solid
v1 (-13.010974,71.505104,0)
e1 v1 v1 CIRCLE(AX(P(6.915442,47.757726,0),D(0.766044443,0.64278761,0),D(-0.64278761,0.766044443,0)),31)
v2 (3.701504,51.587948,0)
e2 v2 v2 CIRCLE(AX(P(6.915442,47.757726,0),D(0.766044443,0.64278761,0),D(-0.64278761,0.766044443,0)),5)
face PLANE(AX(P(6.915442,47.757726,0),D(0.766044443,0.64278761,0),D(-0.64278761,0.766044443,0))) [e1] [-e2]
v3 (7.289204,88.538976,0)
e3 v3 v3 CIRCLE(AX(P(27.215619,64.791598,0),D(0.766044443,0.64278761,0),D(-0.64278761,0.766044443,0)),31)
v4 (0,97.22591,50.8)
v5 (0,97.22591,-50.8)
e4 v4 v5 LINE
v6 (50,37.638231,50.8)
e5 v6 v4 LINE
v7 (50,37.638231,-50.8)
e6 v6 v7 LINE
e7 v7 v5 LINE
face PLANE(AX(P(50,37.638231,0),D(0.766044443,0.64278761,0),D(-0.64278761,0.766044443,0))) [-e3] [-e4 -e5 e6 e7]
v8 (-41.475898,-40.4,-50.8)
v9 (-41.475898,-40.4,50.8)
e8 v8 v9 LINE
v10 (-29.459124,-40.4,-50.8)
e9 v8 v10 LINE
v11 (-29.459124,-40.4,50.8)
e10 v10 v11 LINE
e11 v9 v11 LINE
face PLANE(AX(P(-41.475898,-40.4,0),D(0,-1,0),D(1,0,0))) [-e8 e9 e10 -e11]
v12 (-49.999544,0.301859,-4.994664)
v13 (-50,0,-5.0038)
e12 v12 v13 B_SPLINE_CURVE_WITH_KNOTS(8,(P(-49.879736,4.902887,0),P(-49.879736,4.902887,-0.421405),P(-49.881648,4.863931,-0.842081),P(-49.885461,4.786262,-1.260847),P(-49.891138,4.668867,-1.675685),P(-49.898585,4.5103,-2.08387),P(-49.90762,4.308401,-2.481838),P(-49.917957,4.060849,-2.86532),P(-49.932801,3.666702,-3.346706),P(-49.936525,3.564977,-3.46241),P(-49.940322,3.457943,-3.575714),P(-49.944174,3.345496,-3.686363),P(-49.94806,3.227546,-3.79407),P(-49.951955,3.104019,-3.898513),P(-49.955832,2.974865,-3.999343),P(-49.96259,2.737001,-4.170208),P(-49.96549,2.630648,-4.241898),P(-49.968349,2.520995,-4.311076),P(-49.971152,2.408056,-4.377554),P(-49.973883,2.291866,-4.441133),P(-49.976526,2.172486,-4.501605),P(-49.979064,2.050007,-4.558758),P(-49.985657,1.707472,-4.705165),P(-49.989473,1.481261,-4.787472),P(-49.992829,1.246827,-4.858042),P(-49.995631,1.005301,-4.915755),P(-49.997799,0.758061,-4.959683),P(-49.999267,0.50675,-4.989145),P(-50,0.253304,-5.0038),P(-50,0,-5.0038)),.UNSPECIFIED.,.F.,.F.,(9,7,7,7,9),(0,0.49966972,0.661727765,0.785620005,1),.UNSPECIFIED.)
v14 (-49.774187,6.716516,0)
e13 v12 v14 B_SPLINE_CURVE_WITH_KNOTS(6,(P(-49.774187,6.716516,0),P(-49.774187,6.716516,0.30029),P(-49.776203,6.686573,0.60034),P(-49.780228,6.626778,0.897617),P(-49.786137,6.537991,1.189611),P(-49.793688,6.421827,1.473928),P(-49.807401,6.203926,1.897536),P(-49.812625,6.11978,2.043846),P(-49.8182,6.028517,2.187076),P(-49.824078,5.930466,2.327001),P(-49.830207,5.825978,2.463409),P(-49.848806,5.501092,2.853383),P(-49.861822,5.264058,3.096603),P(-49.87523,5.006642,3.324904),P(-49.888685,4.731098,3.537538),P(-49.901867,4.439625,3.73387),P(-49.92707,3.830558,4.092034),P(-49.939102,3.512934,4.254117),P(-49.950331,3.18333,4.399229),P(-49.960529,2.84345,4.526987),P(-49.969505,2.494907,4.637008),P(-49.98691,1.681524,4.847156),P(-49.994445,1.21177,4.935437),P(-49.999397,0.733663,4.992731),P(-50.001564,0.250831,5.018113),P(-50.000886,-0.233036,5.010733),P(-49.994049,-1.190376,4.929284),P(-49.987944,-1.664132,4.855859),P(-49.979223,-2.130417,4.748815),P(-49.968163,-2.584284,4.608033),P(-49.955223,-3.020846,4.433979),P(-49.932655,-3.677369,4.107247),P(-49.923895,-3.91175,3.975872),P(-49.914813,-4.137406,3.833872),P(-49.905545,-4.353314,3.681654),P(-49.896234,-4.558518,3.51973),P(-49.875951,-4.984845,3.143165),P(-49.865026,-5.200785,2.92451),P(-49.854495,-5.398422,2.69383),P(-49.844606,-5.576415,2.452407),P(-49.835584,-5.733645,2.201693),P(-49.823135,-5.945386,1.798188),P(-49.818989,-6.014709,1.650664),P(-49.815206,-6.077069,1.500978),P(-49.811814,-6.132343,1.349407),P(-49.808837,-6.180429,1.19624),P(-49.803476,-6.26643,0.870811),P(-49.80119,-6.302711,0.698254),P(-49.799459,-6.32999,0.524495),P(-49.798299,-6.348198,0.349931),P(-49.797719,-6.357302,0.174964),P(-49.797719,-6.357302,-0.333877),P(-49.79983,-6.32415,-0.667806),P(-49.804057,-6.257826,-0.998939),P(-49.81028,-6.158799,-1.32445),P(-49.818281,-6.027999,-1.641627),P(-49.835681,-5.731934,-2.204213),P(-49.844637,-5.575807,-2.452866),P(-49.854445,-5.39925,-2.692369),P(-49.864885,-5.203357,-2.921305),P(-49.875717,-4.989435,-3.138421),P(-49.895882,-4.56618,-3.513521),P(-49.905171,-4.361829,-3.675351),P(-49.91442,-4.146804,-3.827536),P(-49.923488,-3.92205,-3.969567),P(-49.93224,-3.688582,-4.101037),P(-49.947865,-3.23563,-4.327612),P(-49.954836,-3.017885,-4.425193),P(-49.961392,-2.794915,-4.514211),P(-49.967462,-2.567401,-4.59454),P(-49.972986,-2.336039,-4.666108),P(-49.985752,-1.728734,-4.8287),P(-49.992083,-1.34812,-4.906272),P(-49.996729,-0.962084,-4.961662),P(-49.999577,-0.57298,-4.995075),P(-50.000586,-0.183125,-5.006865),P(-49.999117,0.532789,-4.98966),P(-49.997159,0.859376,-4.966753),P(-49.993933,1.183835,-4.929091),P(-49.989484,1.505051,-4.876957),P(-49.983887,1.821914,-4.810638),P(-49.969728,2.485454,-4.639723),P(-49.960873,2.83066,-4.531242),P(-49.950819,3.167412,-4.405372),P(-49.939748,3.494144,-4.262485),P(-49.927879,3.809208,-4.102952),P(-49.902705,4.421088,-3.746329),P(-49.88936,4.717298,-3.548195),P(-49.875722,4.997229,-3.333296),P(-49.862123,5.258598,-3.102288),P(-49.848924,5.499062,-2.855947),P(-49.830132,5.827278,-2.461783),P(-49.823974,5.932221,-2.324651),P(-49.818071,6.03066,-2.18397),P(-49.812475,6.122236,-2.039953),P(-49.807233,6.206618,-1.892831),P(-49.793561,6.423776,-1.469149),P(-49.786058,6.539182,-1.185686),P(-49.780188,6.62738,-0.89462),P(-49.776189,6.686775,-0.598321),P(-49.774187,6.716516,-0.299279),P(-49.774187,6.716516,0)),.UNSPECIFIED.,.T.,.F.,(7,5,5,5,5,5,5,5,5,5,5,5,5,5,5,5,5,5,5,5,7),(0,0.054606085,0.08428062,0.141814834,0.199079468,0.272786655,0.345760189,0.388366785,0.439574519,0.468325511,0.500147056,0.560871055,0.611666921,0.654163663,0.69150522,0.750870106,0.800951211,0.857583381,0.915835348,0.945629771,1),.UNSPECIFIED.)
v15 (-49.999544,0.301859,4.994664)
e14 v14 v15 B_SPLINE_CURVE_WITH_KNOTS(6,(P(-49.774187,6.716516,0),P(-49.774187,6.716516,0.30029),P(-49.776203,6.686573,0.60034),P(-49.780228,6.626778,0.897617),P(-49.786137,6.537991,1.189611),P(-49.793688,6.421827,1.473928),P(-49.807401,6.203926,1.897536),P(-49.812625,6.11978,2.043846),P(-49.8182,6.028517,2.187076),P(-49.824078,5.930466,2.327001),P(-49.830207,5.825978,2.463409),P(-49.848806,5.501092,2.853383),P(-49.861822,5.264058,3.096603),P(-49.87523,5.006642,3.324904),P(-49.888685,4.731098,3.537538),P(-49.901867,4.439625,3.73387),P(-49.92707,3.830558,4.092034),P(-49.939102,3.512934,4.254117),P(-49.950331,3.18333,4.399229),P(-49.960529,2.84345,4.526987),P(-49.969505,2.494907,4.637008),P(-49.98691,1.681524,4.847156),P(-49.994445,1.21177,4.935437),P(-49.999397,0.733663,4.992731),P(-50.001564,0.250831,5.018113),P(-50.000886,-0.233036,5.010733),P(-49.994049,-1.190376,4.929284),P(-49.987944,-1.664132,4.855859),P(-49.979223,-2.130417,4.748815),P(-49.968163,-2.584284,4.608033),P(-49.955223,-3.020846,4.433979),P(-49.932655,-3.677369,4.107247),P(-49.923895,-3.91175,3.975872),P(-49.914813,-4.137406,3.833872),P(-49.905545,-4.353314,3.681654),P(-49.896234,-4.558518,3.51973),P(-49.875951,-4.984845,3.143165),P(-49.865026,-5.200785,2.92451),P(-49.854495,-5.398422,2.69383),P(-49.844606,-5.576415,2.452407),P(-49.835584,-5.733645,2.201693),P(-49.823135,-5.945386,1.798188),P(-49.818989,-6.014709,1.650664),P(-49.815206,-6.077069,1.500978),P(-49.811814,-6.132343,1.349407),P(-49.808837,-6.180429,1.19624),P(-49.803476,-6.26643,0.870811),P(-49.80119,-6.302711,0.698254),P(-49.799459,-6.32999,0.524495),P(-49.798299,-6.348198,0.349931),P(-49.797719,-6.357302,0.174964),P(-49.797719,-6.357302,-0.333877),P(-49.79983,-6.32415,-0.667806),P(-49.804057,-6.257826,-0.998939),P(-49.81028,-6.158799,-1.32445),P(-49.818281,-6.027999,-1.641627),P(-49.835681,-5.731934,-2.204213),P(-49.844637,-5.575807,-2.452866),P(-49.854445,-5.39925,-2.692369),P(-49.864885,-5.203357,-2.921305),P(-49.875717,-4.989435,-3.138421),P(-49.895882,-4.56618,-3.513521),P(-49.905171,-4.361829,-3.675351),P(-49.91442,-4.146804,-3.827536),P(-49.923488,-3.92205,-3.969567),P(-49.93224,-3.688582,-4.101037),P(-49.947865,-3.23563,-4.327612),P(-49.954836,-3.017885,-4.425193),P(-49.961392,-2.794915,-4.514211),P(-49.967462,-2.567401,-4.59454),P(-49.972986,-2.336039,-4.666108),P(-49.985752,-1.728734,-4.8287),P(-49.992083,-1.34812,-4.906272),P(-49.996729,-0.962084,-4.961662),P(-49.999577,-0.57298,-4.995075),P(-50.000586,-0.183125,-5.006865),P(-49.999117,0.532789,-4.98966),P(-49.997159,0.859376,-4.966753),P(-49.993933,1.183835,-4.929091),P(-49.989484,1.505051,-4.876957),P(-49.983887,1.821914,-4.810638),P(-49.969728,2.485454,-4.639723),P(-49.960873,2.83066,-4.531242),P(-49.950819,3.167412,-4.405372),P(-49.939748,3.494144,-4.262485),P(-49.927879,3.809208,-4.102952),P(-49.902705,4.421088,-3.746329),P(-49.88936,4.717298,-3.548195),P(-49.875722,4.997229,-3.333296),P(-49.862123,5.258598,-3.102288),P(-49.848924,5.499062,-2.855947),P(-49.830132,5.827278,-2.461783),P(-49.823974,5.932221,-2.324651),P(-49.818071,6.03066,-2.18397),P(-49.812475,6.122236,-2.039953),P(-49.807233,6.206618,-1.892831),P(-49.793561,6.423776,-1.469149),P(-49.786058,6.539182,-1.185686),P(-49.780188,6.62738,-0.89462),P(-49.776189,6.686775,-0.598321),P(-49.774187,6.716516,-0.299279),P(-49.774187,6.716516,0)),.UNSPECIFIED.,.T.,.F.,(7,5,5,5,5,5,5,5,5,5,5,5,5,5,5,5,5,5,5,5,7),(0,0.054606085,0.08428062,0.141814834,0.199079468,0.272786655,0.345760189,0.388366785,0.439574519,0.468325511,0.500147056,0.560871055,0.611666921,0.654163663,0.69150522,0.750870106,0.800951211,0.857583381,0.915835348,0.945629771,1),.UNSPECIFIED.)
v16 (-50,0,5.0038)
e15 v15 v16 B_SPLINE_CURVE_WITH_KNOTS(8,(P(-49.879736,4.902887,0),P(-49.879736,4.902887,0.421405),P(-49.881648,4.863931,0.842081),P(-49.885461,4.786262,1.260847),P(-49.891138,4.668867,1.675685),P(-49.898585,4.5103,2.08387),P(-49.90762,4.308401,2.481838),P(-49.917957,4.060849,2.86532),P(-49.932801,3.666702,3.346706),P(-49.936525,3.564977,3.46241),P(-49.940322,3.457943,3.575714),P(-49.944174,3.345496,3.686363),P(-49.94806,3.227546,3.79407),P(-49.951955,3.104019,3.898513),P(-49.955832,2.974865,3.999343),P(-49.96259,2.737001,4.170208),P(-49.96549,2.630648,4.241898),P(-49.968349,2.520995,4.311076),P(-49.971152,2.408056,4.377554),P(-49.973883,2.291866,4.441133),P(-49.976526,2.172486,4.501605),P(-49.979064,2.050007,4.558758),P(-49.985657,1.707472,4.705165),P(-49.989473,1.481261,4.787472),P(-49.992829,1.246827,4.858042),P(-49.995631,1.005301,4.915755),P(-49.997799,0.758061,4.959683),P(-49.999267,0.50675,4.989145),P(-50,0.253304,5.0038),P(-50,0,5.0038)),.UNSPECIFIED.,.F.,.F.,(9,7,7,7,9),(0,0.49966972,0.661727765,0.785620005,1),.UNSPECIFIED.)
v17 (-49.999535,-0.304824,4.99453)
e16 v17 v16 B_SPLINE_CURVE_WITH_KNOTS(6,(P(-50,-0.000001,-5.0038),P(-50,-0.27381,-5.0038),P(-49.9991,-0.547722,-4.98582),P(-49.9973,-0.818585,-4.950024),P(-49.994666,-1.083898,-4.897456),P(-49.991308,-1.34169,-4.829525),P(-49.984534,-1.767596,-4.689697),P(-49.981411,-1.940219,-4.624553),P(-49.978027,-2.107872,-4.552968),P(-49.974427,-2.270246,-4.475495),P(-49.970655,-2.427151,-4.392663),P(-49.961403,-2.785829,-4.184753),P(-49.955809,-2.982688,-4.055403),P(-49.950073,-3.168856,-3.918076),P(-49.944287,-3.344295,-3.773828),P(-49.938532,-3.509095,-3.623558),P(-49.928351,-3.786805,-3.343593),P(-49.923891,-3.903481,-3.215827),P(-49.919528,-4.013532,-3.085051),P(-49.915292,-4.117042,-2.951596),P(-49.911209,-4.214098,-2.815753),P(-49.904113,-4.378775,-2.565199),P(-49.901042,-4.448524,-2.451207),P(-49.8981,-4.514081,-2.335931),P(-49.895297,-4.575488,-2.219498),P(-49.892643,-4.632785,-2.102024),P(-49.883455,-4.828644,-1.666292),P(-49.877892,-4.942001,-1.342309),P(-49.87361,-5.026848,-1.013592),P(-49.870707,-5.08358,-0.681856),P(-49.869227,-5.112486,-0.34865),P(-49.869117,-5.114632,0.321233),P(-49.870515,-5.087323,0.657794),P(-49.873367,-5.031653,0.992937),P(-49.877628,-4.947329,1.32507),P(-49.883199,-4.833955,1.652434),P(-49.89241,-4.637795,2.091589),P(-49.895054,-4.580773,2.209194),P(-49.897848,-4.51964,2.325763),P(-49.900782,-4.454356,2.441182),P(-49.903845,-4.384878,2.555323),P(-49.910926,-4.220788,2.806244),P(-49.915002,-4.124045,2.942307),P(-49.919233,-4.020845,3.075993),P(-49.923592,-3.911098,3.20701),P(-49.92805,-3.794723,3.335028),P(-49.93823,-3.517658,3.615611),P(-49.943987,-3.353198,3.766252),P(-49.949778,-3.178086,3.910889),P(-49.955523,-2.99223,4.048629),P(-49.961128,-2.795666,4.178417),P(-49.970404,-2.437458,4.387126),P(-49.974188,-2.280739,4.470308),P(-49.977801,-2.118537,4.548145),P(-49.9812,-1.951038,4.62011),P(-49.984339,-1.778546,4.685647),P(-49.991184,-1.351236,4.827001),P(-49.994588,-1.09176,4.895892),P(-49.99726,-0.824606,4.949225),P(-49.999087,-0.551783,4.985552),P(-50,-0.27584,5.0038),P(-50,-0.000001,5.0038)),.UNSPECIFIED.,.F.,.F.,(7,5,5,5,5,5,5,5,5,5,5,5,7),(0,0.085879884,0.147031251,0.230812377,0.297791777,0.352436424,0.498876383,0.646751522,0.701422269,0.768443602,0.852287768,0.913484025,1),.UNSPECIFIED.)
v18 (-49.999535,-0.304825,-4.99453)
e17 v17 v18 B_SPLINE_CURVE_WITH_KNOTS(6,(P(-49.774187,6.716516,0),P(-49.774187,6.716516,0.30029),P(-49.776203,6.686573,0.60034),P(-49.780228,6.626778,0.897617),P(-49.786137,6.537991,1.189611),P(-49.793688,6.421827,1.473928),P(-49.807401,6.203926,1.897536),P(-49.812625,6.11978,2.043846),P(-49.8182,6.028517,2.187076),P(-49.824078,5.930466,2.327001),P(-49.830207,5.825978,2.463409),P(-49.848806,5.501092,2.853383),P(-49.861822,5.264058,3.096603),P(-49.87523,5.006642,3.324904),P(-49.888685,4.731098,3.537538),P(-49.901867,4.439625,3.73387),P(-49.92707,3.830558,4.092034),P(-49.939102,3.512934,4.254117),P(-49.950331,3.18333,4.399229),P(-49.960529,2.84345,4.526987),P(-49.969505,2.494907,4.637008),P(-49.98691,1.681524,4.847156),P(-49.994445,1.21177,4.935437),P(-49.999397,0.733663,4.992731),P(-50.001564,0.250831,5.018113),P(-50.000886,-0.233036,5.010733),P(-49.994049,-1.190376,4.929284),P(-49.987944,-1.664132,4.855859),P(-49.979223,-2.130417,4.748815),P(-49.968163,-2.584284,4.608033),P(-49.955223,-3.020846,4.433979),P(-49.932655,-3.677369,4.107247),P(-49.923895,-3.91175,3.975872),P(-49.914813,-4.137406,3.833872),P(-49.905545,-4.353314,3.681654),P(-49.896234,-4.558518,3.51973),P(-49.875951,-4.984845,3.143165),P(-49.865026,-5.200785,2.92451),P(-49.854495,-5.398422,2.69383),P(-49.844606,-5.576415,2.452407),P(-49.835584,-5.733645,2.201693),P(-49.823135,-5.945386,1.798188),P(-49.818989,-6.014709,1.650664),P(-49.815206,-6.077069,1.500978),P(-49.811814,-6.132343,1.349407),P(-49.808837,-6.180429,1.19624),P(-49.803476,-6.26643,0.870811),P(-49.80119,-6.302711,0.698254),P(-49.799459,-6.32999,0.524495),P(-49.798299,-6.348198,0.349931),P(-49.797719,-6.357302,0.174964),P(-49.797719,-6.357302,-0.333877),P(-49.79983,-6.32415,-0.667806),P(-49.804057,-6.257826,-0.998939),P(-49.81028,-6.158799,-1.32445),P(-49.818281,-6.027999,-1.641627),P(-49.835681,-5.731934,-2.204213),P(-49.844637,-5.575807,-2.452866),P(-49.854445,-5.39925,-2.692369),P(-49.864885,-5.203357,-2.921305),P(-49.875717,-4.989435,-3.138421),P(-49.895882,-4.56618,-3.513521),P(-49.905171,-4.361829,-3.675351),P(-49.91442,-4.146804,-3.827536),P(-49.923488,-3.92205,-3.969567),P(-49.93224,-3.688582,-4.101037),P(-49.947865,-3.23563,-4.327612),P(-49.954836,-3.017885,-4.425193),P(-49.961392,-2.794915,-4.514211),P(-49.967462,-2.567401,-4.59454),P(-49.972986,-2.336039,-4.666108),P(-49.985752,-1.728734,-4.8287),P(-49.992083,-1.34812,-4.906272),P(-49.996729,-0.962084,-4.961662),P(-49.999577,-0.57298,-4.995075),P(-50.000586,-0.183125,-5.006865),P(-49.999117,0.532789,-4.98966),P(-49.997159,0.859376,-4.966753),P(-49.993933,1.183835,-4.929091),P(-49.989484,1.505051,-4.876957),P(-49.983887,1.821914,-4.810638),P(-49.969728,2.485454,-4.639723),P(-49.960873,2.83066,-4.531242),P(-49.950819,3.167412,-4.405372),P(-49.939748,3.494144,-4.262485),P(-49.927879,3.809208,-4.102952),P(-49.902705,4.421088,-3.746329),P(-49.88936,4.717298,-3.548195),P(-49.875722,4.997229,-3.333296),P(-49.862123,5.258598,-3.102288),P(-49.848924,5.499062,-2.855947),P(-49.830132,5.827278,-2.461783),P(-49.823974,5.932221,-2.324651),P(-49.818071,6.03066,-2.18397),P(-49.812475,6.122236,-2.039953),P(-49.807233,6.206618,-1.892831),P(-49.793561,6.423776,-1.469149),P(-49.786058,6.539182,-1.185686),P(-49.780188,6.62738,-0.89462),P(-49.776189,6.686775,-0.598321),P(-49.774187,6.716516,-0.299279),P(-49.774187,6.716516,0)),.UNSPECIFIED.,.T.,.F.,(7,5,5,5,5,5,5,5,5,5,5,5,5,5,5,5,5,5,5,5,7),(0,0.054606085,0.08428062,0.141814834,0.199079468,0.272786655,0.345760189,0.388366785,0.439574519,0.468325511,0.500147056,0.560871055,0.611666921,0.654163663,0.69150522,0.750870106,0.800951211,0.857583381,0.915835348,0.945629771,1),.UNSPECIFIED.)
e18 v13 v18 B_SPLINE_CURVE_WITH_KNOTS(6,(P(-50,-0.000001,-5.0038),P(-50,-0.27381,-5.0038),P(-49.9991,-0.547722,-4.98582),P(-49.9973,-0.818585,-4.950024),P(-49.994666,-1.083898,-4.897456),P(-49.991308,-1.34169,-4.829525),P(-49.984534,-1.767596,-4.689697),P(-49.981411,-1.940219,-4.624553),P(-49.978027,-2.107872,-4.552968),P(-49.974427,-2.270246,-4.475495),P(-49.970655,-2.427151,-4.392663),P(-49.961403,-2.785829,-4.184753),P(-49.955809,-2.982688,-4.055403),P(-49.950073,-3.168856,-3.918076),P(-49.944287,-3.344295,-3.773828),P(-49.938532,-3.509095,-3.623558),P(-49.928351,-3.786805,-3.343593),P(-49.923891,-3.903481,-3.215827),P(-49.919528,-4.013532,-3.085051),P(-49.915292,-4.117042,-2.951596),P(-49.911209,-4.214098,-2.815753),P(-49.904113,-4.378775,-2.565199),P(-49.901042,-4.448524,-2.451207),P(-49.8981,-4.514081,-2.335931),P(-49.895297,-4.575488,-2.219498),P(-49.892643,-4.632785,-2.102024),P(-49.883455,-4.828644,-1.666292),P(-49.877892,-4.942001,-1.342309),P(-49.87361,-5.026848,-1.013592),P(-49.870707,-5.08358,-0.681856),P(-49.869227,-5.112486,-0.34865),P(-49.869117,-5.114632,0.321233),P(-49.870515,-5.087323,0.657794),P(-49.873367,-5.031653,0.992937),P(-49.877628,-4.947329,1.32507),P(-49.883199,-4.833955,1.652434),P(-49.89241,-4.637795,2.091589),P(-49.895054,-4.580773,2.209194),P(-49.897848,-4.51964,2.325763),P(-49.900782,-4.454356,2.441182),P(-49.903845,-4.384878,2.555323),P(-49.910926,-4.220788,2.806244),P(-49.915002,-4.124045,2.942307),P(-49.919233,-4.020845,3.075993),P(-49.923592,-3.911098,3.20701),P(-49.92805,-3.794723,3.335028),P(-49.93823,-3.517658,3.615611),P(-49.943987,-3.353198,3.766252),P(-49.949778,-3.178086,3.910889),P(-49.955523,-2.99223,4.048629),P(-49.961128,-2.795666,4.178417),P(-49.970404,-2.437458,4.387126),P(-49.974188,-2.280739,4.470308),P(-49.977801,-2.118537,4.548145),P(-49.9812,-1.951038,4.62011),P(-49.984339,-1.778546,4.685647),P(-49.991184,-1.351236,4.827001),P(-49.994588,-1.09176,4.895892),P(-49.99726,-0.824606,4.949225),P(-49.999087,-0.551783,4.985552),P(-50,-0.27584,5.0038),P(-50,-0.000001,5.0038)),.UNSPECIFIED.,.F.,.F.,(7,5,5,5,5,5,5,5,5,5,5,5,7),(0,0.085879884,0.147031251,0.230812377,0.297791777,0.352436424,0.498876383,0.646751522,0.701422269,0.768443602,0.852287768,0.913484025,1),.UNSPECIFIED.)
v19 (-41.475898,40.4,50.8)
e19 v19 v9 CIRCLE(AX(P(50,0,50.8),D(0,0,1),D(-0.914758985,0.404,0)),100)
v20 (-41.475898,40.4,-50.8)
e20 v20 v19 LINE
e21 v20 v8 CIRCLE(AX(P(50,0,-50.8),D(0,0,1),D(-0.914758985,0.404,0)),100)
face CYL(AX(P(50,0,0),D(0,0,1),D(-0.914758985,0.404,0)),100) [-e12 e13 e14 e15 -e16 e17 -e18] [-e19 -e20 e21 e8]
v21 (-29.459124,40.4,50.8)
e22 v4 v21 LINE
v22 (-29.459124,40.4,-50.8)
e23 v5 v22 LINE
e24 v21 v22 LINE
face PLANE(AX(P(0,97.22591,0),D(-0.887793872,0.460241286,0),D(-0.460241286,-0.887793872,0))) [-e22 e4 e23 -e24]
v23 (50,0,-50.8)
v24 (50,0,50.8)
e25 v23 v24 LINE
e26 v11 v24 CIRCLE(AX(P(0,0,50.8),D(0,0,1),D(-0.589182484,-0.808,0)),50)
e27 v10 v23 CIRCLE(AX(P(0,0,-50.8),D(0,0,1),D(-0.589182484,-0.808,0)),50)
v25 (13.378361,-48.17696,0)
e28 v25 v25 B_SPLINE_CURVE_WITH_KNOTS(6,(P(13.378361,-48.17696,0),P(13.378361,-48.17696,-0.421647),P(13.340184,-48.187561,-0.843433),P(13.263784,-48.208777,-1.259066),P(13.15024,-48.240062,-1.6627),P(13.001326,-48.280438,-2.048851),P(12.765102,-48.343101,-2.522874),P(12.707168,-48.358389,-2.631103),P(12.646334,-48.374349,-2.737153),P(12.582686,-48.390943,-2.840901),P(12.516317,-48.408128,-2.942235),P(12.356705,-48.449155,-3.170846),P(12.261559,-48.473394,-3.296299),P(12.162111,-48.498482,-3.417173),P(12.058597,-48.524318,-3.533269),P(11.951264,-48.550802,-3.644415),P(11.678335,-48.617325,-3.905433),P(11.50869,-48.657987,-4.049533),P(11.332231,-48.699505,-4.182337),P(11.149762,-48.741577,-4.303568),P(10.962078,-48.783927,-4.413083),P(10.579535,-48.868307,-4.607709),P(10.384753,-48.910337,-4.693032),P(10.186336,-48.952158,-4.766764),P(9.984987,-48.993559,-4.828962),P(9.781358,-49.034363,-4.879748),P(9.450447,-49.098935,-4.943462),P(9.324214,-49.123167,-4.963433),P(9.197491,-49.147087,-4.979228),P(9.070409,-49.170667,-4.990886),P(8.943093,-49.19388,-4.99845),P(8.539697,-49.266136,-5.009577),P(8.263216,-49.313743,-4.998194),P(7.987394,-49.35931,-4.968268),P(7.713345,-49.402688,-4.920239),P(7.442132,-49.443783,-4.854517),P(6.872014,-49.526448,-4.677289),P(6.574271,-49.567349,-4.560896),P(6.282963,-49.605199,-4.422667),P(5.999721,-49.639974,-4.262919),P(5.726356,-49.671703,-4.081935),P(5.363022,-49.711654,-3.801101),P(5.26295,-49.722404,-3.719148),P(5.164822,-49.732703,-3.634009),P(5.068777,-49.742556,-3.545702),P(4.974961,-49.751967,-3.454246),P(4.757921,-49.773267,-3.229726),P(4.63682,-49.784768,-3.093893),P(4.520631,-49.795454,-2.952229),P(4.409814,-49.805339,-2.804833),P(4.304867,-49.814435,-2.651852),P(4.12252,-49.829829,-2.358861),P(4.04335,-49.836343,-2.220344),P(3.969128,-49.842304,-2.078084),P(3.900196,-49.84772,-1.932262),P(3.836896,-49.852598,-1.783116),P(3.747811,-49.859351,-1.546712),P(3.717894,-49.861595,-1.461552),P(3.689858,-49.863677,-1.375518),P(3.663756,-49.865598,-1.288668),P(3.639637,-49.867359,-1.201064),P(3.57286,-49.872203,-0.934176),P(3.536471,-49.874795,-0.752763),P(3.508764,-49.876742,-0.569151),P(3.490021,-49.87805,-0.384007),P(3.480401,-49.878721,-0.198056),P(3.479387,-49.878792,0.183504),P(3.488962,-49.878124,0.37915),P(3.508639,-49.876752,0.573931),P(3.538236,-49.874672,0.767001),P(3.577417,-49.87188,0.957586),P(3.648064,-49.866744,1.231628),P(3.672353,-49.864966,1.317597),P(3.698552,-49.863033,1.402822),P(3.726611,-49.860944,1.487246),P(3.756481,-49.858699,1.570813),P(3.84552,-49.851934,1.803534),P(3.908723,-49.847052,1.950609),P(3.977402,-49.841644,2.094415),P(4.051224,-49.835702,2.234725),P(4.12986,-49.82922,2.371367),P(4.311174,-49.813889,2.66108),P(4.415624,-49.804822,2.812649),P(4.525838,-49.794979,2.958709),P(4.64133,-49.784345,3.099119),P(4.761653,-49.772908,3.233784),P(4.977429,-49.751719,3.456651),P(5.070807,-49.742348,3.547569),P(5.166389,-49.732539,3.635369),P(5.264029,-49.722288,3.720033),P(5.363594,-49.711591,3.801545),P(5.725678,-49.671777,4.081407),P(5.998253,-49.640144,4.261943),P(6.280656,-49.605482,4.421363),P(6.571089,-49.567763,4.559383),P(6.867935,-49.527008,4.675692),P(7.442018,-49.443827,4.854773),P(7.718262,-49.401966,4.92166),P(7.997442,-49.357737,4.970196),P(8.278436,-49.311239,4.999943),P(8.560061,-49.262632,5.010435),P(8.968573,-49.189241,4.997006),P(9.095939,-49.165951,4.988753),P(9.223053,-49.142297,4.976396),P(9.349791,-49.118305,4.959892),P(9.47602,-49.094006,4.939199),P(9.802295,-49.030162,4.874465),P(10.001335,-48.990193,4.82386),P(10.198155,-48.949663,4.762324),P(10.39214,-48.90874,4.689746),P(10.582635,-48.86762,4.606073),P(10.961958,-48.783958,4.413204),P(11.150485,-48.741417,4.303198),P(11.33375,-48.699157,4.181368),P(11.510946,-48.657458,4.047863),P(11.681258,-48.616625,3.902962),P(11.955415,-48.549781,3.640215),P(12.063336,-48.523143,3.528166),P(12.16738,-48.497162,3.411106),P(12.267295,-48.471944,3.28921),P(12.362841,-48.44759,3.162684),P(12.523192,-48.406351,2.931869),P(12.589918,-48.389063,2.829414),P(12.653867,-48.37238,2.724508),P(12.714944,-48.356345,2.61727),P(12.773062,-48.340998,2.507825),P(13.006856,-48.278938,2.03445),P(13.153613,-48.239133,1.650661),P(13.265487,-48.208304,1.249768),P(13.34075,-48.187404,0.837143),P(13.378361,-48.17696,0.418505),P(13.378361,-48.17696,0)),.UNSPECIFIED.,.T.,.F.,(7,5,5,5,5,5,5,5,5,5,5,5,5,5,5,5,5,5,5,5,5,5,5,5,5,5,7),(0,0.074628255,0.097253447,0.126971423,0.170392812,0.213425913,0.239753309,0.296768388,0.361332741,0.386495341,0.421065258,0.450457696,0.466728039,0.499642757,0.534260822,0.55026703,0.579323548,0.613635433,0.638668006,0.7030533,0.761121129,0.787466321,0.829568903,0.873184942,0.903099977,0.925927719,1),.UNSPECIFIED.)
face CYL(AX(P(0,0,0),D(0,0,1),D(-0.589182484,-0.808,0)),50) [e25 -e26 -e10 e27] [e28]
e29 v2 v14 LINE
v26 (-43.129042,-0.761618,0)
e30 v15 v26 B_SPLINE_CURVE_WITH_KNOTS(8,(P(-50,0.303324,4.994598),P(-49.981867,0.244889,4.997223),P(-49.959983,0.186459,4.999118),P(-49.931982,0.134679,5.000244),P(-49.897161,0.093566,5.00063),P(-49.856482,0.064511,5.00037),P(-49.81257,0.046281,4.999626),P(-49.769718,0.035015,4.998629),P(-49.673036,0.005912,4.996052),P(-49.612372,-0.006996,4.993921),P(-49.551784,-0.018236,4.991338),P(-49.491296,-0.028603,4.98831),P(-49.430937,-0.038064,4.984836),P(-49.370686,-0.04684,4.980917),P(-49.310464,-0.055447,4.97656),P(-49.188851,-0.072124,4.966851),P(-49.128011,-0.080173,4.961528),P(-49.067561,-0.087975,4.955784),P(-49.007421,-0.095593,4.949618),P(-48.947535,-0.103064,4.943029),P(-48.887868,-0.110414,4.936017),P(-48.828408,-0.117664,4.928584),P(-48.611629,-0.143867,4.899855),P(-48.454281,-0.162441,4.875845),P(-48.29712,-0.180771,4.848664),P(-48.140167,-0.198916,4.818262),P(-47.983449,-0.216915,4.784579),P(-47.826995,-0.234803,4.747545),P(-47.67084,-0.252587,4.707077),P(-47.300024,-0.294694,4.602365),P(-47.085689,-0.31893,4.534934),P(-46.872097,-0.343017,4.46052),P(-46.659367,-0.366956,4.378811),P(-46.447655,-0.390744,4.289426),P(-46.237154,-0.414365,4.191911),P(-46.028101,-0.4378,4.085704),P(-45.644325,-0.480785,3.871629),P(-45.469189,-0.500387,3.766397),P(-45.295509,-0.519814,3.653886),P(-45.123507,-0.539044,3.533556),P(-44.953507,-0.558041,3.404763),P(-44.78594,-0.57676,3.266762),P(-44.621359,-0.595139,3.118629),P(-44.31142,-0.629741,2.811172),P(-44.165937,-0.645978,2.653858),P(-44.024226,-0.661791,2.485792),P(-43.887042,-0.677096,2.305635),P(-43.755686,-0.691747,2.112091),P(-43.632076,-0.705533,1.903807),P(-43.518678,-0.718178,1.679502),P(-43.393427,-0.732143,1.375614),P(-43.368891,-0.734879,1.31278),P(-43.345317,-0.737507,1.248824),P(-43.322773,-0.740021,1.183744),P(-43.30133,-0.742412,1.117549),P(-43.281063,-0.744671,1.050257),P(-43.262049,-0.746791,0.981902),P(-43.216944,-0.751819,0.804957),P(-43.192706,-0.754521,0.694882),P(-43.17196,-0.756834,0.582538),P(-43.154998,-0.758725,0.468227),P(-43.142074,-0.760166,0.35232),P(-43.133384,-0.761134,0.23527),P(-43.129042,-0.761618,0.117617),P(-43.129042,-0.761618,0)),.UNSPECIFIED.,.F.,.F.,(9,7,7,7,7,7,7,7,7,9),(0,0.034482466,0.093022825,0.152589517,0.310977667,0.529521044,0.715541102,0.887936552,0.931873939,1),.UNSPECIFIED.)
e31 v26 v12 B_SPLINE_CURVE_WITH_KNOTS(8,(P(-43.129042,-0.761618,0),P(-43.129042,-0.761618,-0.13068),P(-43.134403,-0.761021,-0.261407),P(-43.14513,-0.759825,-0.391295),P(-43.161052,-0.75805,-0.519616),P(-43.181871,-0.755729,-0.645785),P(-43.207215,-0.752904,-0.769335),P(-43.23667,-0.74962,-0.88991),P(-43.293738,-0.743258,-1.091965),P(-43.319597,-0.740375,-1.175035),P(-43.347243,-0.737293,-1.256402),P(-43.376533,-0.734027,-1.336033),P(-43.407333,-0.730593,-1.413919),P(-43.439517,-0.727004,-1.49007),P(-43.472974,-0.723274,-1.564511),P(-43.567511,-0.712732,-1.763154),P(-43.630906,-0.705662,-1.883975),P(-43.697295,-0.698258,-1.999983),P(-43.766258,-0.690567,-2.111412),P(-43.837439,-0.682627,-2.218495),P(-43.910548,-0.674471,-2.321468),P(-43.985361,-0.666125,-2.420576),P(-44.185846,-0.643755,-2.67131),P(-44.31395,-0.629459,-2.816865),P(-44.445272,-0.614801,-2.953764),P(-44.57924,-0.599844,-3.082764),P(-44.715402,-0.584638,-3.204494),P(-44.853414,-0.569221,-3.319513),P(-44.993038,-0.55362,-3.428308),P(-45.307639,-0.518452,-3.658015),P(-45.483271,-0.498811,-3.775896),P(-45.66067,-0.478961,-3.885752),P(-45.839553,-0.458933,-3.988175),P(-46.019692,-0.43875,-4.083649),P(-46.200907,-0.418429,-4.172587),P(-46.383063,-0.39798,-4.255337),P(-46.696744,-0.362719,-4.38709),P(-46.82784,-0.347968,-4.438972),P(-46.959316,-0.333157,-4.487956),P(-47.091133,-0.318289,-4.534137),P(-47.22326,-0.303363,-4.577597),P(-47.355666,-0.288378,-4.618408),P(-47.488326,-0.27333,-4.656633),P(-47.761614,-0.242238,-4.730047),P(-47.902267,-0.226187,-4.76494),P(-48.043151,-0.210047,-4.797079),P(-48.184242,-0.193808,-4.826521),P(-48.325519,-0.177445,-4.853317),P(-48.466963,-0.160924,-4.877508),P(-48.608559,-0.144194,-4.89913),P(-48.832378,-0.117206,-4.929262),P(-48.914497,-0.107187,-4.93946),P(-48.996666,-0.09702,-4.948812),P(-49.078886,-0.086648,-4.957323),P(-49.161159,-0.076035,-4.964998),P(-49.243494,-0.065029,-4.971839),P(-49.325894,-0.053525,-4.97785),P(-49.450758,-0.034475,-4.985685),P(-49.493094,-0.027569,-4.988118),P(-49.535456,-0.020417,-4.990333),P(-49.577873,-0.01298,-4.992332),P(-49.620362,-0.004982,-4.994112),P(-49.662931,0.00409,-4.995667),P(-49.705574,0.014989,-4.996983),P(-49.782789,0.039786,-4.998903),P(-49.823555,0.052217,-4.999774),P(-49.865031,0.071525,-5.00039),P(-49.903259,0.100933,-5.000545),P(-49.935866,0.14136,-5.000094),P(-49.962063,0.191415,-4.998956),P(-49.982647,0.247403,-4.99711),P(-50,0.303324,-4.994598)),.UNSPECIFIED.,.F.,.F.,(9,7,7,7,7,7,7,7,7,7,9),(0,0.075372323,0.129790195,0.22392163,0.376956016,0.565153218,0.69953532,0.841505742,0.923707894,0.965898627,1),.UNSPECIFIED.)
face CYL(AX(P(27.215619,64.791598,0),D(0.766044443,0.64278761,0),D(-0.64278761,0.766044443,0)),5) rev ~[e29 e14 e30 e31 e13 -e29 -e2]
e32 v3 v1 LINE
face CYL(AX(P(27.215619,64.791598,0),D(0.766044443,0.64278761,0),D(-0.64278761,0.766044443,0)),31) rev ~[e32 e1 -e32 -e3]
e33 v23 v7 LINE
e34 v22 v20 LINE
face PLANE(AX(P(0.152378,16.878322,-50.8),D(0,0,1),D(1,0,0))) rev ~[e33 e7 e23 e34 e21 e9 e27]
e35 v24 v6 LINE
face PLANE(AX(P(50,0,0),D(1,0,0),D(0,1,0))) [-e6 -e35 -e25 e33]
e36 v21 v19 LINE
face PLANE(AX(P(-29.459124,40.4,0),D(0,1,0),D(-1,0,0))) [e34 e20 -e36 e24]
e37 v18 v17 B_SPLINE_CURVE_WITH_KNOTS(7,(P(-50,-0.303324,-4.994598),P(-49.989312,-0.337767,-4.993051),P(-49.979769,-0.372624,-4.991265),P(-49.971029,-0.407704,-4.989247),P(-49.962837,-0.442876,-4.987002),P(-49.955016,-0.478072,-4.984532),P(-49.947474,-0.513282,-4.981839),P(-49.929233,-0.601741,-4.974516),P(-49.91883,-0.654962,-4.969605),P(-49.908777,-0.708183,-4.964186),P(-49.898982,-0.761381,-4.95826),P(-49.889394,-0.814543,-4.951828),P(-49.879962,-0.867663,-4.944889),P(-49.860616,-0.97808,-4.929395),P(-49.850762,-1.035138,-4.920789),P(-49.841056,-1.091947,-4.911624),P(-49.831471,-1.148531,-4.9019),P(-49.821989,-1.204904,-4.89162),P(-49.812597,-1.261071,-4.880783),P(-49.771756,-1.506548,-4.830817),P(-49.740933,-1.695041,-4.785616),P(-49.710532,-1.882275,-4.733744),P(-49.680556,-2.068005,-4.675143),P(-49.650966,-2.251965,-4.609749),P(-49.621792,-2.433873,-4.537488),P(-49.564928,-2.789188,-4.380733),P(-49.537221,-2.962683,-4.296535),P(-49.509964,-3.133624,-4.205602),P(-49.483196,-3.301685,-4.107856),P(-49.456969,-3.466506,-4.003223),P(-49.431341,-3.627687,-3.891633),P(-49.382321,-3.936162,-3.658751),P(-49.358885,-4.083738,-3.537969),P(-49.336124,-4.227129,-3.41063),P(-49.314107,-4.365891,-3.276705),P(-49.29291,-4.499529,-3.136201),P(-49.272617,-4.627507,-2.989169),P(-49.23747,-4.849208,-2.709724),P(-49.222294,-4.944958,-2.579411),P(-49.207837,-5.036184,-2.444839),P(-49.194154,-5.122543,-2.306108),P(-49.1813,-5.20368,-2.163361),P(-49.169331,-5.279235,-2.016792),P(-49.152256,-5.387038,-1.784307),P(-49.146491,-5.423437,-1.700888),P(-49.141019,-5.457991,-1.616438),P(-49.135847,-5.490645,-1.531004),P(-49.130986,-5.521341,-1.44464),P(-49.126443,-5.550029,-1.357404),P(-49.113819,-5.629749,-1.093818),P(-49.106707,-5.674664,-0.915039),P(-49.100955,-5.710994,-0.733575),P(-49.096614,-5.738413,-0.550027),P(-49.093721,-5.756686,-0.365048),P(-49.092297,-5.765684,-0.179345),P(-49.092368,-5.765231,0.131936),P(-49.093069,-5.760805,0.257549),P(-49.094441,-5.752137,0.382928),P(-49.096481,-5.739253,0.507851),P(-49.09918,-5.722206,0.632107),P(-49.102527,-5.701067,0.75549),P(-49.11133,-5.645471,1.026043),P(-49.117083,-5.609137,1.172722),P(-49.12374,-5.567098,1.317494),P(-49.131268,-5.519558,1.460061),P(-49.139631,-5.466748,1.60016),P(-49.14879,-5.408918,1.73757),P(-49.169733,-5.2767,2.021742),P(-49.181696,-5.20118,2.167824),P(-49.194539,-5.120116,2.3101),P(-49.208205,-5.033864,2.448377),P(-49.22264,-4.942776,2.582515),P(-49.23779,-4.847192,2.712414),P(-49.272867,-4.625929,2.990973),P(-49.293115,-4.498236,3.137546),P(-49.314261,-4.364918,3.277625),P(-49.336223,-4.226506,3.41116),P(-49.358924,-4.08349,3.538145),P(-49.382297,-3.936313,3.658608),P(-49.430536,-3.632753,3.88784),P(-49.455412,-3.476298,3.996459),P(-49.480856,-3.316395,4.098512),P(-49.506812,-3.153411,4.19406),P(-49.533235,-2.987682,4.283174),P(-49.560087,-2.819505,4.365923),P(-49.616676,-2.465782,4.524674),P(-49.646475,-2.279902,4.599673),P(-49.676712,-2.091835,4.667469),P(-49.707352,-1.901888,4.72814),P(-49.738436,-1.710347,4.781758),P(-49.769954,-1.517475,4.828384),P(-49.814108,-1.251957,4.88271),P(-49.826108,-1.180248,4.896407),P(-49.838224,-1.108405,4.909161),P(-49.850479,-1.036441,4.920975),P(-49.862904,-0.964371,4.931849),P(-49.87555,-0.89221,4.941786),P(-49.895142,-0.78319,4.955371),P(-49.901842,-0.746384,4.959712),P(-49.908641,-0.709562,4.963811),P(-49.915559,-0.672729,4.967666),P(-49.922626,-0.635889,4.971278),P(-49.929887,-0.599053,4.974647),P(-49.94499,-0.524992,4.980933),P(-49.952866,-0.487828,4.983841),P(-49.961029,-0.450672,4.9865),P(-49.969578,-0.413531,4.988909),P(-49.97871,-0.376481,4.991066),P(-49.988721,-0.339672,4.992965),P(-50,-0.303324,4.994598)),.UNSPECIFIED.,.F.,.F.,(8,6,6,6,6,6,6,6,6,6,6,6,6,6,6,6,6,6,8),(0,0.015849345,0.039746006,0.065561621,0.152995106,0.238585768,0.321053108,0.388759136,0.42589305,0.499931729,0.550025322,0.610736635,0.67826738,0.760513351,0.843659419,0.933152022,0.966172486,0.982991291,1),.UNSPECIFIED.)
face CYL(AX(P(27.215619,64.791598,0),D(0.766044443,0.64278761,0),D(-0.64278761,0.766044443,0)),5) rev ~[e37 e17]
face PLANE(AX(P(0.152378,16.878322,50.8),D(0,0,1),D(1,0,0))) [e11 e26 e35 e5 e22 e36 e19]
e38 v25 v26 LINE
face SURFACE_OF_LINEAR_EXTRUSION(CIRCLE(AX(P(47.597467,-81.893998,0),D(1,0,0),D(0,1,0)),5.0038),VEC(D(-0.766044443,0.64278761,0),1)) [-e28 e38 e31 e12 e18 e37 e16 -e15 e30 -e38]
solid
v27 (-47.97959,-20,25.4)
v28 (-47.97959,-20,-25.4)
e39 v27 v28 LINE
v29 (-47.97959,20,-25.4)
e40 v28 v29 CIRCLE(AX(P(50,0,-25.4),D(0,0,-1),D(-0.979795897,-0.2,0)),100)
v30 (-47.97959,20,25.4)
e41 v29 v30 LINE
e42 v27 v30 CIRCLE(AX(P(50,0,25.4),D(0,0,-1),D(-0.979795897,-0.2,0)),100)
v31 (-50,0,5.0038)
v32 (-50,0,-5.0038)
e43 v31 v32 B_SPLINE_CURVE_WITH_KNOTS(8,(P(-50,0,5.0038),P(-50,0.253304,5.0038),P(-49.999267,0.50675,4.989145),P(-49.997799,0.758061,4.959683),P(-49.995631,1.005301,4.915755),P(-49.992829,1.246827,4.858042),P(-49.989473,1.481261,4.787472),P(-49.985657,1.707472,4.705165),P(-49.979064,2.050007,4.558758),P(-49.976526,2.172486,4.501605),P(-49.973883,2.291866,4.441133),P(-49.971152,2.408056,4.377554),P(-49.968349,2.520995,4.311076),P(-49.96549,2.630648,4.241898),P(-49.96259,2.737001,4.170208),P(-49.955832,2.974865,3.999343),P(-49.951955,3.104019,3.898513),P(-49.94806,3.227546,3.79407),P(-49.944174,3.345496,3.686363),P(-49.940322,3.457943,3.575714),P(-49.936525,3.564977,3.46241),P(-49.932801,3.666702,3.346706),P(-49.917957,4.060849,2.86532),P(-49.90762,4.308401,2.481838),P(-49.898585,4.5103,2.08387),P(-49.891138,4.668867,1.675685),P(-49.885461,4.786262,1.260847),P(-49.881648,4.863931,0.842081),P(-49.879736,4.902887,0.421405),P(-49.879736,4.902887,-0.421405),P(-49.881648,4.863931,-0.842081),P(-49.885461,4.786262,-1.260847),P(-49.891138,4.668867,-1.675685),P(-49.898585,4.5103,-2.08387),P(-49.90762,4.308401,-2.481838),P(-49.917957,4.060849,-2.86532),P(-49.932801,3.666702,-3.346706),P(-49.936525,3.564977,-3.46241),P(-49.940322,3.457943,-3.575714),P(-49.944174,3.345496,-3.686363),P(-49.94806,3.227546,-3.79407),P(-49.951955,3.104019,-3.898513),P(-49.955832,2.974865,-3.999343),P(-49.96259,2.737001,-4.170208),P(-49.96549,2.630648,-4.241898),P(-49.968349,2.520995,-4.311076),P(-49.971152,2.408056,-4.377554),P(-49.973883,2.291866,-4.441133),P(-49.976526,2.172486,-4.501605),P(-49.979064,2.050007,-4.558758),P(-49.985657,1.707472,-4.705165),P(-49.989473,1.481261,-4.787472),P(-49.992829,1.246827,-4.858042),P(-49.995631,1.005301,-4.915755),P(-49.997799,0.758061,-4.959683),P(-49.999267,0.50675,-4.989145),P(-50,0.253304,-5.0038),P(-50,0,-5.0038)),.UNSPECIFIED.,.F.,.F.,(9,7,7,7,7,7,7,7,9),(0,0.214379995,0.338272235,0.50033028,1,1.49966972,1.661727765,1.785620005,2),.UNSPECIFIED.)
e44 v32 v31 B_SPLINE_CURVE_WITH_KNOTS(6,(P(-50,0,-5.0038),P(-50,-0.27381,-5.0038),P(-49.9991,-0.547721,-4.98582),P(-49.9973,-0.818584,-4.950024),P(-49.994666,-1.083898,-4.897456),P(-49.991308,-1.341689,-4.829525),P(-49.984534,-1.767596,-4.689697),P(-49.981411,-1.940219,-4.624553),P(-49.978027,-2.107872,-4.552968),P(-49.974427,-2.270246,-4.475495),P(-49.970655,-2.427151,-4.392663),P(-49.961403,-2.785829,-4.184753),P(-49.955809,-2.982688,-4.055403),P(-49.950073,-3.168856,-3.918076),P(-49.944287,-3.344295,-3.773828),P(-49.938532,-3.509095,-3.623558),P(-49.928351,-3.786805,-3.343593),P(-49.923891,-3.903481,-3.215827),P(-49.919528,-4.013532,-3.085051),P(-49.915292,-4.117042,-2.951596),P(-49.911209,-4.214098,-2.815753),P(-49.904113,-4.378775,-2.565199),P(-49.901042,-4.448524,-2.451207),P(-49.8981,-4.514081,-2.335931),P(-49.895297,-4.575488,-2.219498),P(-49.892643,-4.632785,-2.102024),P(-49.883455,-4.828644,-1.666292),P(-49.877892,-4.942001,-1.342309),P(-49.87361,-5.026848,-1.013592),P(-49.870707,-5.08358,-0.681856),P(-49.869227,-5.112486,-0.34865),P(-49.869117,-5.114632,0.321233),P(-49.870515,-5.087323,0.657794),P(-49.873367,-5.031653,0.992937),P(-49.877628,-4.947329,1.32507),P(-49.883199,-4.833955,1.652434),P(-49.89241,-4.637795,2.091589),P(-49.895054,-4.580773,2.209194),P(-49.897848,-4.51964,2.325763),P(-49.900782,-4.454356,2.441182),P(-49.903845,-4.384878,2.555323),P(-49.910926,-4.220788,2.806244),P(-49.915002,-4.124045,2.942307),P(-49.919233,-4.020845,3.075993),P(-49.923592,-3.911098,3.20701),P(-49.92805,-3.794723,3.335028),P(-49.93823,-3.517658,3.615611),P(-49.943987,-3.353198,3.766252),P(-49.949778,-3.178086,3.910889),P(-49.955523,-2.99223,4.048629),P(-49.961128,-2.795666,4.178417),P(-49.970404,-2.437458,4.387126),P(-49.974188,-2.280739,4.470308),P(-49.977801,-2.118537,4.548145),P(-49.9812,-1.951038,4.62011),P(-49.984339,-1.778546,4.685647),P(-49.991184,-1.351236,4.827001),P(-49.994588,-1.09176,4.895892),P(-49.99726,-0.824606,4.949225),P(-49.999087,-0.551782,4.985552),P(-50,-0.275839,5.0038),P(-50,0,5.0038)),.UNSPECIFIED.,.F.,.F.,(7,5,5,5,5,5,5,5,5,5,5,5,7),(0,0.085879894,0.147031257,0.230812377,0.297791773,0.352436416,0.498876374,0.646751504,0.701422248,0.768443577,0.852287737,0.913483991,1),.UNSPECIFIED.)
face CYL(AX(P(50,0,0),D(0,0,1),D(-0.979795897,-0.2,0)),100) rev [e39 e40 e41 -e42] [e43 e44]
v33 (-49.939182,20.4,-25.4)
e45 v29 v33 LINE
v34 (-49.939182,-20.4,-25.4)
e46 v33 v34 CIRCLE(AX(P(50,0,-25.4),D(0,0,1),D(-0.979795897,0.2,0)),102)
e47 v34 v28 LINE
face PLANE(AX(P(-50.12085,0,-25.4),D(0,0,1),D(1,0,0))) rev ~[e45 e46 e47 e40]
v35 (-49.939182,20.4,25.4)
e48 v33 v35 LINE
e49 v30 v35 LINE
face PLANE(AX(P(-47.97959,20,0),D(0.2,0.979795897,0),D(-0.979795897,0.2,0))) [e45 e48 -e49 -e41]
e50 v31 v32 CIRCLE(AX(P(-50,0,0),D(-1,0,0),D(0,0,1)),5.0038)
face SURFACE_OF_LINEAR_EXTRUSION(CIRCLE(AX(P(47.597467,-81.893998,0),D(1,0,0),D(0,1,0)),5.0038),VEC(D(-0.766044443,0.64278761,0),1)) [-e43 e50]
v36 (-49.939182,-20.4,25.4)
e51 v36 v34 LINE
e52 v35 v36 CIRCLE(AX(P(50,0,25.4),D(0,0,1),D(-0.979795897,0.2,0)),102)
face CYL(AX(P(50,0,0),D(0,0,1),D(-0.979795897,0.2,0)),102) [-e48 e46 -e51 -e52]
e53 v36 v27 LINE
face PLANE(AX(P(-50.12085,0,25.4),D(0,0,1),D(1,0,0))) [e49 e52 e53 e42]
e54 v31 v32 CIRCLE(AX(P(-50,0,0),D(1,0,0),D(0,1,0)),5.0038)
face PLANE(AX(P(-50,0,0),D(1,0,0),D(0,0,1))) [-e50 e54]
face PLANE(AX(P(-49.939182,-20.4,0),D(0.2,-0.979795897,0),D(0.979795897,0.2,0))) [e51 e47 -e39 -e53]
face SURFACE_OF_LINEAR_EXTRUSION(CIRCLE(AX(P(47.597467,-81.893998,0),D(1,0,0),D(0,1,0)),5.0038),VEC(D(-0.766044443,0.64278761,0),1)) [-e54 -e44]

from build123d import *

# Parameters (mm, degrees)
F2_DEPTH      = 25.4
F2_DEPTH_BACK = 25.4
F4_DEPTH      = 50.8
F4_DEPTH_BACK = 50.8
F5_R          = 5
F6_DEPTH      = 127
F7_R          = 31
F8_DEPTH      = 26.5
F9_R          = 5.0038


with BuildPart() as f2:
    # F1 (on Top) → F2 (new body, two sides)
    with BuildSketch(Plane.XY) as f2_sk:
        with BuildLine():
            ThreePointArc((-47.9795897113, -20), (-50, 0), (-47.9795897113, 20))
            Line((-47.9795897113, 20), (-49.9391815056, 20.4))
            ThreePointArc((-49.9391815056, 20.4), (-52, 0), (-49.9391815056, -20.4))
            Line((-49.9391815056, -20.4), (-47.9795897113, -20))
        make_face()
    extrude(amount=F2_DEPTH)
    extrude(f2_sk.sketch, amount=-F2_DEPTH_BACK)


with BuildPart() as f4:
    # F3 (on Top) → F4 (new body, two sides)
    with BuildSketch(Plane.XY) as f4_sk:
        with BuildLine():
            Line((-29.4591242232, 40.4), (-41.4758984651, 40.4))
            ThreePointArc((-41.4758984651, 40.4), (-50, 0), (-41.4758984651, -40.4))
            Line((-41.4758984651, -40.4), (-29.4591242232, -40.4))
            ThreePointArc((-29.4591242232, -40.4), (22.6610214778, -44.569923778), (50, 0))
            Line((50, 0), (50, 37.638230517))
            Line((50, 37.638230517), (0, 97.2259101467))
            Line((0, 97.2259101467), (-29.4591242232, 40.4))
        make_face()
    extrude(amount=F4_DEPTH)
    extrude(f4_sk.sketch, amount=-F4_DEPTH_BACK)

    # F5 (on face) → F6 (cut)
    with BuildSketch(Plane(origin=(47.8744150531, 40.1714040139, 0), x_dir=(-0.6427876097, 0.7660444431, 0), z_dir=(0.7660444431, 0.6427876097, 0))):
        with Locations((32.1393804843, 0)):
            Circle(F5_R)
    extrude(amount=-F6_DEPTH, mode=Mode.SUBTRACT)

    # F7 (on face) → F8 (cut)
    with BuildSketch(Plane(origin=(47.8744150531, 40.1714040139, 0), x_dir=(-0.6427876097, 0.7660444431, 0), z_dir=(0.7660444431, 0.6427876097, 0))):
        with Locations((32.1393804843, 0)):
            Circle(F7_R)
    extrude(amount=-F8_DEPTH, mode=Mode.SUBTRACT)


with BuildPart() as f10_tool:
    # F10: sweep along a path in F0
    with BuildLine(Plane.XY) as f10_path:
        Line((47.5974665938, -81.8939982227), (-50, 0))
    # F9 (on Right) → F10 (sweep)
    with BuildSketch(Plane.YZ):
        with Locations((-41.9549815589, 0)):
            Circle(F9_R)
    sweep(path=f10_path.line)


with BuildPart() as f2_1:
    add(f2.part)

    # F10: cut by f10_tool
    add(f10_tool.part, mode=Mode.SUBTRACT)


with BuildPart() as f4_1:
    add(f4.part)

    # F10: cut by f10_tool
    add(f10_tool.part, mode=Mode.SUBTRACT)


solid = Compound([f2_1.part, f4_1.part])
